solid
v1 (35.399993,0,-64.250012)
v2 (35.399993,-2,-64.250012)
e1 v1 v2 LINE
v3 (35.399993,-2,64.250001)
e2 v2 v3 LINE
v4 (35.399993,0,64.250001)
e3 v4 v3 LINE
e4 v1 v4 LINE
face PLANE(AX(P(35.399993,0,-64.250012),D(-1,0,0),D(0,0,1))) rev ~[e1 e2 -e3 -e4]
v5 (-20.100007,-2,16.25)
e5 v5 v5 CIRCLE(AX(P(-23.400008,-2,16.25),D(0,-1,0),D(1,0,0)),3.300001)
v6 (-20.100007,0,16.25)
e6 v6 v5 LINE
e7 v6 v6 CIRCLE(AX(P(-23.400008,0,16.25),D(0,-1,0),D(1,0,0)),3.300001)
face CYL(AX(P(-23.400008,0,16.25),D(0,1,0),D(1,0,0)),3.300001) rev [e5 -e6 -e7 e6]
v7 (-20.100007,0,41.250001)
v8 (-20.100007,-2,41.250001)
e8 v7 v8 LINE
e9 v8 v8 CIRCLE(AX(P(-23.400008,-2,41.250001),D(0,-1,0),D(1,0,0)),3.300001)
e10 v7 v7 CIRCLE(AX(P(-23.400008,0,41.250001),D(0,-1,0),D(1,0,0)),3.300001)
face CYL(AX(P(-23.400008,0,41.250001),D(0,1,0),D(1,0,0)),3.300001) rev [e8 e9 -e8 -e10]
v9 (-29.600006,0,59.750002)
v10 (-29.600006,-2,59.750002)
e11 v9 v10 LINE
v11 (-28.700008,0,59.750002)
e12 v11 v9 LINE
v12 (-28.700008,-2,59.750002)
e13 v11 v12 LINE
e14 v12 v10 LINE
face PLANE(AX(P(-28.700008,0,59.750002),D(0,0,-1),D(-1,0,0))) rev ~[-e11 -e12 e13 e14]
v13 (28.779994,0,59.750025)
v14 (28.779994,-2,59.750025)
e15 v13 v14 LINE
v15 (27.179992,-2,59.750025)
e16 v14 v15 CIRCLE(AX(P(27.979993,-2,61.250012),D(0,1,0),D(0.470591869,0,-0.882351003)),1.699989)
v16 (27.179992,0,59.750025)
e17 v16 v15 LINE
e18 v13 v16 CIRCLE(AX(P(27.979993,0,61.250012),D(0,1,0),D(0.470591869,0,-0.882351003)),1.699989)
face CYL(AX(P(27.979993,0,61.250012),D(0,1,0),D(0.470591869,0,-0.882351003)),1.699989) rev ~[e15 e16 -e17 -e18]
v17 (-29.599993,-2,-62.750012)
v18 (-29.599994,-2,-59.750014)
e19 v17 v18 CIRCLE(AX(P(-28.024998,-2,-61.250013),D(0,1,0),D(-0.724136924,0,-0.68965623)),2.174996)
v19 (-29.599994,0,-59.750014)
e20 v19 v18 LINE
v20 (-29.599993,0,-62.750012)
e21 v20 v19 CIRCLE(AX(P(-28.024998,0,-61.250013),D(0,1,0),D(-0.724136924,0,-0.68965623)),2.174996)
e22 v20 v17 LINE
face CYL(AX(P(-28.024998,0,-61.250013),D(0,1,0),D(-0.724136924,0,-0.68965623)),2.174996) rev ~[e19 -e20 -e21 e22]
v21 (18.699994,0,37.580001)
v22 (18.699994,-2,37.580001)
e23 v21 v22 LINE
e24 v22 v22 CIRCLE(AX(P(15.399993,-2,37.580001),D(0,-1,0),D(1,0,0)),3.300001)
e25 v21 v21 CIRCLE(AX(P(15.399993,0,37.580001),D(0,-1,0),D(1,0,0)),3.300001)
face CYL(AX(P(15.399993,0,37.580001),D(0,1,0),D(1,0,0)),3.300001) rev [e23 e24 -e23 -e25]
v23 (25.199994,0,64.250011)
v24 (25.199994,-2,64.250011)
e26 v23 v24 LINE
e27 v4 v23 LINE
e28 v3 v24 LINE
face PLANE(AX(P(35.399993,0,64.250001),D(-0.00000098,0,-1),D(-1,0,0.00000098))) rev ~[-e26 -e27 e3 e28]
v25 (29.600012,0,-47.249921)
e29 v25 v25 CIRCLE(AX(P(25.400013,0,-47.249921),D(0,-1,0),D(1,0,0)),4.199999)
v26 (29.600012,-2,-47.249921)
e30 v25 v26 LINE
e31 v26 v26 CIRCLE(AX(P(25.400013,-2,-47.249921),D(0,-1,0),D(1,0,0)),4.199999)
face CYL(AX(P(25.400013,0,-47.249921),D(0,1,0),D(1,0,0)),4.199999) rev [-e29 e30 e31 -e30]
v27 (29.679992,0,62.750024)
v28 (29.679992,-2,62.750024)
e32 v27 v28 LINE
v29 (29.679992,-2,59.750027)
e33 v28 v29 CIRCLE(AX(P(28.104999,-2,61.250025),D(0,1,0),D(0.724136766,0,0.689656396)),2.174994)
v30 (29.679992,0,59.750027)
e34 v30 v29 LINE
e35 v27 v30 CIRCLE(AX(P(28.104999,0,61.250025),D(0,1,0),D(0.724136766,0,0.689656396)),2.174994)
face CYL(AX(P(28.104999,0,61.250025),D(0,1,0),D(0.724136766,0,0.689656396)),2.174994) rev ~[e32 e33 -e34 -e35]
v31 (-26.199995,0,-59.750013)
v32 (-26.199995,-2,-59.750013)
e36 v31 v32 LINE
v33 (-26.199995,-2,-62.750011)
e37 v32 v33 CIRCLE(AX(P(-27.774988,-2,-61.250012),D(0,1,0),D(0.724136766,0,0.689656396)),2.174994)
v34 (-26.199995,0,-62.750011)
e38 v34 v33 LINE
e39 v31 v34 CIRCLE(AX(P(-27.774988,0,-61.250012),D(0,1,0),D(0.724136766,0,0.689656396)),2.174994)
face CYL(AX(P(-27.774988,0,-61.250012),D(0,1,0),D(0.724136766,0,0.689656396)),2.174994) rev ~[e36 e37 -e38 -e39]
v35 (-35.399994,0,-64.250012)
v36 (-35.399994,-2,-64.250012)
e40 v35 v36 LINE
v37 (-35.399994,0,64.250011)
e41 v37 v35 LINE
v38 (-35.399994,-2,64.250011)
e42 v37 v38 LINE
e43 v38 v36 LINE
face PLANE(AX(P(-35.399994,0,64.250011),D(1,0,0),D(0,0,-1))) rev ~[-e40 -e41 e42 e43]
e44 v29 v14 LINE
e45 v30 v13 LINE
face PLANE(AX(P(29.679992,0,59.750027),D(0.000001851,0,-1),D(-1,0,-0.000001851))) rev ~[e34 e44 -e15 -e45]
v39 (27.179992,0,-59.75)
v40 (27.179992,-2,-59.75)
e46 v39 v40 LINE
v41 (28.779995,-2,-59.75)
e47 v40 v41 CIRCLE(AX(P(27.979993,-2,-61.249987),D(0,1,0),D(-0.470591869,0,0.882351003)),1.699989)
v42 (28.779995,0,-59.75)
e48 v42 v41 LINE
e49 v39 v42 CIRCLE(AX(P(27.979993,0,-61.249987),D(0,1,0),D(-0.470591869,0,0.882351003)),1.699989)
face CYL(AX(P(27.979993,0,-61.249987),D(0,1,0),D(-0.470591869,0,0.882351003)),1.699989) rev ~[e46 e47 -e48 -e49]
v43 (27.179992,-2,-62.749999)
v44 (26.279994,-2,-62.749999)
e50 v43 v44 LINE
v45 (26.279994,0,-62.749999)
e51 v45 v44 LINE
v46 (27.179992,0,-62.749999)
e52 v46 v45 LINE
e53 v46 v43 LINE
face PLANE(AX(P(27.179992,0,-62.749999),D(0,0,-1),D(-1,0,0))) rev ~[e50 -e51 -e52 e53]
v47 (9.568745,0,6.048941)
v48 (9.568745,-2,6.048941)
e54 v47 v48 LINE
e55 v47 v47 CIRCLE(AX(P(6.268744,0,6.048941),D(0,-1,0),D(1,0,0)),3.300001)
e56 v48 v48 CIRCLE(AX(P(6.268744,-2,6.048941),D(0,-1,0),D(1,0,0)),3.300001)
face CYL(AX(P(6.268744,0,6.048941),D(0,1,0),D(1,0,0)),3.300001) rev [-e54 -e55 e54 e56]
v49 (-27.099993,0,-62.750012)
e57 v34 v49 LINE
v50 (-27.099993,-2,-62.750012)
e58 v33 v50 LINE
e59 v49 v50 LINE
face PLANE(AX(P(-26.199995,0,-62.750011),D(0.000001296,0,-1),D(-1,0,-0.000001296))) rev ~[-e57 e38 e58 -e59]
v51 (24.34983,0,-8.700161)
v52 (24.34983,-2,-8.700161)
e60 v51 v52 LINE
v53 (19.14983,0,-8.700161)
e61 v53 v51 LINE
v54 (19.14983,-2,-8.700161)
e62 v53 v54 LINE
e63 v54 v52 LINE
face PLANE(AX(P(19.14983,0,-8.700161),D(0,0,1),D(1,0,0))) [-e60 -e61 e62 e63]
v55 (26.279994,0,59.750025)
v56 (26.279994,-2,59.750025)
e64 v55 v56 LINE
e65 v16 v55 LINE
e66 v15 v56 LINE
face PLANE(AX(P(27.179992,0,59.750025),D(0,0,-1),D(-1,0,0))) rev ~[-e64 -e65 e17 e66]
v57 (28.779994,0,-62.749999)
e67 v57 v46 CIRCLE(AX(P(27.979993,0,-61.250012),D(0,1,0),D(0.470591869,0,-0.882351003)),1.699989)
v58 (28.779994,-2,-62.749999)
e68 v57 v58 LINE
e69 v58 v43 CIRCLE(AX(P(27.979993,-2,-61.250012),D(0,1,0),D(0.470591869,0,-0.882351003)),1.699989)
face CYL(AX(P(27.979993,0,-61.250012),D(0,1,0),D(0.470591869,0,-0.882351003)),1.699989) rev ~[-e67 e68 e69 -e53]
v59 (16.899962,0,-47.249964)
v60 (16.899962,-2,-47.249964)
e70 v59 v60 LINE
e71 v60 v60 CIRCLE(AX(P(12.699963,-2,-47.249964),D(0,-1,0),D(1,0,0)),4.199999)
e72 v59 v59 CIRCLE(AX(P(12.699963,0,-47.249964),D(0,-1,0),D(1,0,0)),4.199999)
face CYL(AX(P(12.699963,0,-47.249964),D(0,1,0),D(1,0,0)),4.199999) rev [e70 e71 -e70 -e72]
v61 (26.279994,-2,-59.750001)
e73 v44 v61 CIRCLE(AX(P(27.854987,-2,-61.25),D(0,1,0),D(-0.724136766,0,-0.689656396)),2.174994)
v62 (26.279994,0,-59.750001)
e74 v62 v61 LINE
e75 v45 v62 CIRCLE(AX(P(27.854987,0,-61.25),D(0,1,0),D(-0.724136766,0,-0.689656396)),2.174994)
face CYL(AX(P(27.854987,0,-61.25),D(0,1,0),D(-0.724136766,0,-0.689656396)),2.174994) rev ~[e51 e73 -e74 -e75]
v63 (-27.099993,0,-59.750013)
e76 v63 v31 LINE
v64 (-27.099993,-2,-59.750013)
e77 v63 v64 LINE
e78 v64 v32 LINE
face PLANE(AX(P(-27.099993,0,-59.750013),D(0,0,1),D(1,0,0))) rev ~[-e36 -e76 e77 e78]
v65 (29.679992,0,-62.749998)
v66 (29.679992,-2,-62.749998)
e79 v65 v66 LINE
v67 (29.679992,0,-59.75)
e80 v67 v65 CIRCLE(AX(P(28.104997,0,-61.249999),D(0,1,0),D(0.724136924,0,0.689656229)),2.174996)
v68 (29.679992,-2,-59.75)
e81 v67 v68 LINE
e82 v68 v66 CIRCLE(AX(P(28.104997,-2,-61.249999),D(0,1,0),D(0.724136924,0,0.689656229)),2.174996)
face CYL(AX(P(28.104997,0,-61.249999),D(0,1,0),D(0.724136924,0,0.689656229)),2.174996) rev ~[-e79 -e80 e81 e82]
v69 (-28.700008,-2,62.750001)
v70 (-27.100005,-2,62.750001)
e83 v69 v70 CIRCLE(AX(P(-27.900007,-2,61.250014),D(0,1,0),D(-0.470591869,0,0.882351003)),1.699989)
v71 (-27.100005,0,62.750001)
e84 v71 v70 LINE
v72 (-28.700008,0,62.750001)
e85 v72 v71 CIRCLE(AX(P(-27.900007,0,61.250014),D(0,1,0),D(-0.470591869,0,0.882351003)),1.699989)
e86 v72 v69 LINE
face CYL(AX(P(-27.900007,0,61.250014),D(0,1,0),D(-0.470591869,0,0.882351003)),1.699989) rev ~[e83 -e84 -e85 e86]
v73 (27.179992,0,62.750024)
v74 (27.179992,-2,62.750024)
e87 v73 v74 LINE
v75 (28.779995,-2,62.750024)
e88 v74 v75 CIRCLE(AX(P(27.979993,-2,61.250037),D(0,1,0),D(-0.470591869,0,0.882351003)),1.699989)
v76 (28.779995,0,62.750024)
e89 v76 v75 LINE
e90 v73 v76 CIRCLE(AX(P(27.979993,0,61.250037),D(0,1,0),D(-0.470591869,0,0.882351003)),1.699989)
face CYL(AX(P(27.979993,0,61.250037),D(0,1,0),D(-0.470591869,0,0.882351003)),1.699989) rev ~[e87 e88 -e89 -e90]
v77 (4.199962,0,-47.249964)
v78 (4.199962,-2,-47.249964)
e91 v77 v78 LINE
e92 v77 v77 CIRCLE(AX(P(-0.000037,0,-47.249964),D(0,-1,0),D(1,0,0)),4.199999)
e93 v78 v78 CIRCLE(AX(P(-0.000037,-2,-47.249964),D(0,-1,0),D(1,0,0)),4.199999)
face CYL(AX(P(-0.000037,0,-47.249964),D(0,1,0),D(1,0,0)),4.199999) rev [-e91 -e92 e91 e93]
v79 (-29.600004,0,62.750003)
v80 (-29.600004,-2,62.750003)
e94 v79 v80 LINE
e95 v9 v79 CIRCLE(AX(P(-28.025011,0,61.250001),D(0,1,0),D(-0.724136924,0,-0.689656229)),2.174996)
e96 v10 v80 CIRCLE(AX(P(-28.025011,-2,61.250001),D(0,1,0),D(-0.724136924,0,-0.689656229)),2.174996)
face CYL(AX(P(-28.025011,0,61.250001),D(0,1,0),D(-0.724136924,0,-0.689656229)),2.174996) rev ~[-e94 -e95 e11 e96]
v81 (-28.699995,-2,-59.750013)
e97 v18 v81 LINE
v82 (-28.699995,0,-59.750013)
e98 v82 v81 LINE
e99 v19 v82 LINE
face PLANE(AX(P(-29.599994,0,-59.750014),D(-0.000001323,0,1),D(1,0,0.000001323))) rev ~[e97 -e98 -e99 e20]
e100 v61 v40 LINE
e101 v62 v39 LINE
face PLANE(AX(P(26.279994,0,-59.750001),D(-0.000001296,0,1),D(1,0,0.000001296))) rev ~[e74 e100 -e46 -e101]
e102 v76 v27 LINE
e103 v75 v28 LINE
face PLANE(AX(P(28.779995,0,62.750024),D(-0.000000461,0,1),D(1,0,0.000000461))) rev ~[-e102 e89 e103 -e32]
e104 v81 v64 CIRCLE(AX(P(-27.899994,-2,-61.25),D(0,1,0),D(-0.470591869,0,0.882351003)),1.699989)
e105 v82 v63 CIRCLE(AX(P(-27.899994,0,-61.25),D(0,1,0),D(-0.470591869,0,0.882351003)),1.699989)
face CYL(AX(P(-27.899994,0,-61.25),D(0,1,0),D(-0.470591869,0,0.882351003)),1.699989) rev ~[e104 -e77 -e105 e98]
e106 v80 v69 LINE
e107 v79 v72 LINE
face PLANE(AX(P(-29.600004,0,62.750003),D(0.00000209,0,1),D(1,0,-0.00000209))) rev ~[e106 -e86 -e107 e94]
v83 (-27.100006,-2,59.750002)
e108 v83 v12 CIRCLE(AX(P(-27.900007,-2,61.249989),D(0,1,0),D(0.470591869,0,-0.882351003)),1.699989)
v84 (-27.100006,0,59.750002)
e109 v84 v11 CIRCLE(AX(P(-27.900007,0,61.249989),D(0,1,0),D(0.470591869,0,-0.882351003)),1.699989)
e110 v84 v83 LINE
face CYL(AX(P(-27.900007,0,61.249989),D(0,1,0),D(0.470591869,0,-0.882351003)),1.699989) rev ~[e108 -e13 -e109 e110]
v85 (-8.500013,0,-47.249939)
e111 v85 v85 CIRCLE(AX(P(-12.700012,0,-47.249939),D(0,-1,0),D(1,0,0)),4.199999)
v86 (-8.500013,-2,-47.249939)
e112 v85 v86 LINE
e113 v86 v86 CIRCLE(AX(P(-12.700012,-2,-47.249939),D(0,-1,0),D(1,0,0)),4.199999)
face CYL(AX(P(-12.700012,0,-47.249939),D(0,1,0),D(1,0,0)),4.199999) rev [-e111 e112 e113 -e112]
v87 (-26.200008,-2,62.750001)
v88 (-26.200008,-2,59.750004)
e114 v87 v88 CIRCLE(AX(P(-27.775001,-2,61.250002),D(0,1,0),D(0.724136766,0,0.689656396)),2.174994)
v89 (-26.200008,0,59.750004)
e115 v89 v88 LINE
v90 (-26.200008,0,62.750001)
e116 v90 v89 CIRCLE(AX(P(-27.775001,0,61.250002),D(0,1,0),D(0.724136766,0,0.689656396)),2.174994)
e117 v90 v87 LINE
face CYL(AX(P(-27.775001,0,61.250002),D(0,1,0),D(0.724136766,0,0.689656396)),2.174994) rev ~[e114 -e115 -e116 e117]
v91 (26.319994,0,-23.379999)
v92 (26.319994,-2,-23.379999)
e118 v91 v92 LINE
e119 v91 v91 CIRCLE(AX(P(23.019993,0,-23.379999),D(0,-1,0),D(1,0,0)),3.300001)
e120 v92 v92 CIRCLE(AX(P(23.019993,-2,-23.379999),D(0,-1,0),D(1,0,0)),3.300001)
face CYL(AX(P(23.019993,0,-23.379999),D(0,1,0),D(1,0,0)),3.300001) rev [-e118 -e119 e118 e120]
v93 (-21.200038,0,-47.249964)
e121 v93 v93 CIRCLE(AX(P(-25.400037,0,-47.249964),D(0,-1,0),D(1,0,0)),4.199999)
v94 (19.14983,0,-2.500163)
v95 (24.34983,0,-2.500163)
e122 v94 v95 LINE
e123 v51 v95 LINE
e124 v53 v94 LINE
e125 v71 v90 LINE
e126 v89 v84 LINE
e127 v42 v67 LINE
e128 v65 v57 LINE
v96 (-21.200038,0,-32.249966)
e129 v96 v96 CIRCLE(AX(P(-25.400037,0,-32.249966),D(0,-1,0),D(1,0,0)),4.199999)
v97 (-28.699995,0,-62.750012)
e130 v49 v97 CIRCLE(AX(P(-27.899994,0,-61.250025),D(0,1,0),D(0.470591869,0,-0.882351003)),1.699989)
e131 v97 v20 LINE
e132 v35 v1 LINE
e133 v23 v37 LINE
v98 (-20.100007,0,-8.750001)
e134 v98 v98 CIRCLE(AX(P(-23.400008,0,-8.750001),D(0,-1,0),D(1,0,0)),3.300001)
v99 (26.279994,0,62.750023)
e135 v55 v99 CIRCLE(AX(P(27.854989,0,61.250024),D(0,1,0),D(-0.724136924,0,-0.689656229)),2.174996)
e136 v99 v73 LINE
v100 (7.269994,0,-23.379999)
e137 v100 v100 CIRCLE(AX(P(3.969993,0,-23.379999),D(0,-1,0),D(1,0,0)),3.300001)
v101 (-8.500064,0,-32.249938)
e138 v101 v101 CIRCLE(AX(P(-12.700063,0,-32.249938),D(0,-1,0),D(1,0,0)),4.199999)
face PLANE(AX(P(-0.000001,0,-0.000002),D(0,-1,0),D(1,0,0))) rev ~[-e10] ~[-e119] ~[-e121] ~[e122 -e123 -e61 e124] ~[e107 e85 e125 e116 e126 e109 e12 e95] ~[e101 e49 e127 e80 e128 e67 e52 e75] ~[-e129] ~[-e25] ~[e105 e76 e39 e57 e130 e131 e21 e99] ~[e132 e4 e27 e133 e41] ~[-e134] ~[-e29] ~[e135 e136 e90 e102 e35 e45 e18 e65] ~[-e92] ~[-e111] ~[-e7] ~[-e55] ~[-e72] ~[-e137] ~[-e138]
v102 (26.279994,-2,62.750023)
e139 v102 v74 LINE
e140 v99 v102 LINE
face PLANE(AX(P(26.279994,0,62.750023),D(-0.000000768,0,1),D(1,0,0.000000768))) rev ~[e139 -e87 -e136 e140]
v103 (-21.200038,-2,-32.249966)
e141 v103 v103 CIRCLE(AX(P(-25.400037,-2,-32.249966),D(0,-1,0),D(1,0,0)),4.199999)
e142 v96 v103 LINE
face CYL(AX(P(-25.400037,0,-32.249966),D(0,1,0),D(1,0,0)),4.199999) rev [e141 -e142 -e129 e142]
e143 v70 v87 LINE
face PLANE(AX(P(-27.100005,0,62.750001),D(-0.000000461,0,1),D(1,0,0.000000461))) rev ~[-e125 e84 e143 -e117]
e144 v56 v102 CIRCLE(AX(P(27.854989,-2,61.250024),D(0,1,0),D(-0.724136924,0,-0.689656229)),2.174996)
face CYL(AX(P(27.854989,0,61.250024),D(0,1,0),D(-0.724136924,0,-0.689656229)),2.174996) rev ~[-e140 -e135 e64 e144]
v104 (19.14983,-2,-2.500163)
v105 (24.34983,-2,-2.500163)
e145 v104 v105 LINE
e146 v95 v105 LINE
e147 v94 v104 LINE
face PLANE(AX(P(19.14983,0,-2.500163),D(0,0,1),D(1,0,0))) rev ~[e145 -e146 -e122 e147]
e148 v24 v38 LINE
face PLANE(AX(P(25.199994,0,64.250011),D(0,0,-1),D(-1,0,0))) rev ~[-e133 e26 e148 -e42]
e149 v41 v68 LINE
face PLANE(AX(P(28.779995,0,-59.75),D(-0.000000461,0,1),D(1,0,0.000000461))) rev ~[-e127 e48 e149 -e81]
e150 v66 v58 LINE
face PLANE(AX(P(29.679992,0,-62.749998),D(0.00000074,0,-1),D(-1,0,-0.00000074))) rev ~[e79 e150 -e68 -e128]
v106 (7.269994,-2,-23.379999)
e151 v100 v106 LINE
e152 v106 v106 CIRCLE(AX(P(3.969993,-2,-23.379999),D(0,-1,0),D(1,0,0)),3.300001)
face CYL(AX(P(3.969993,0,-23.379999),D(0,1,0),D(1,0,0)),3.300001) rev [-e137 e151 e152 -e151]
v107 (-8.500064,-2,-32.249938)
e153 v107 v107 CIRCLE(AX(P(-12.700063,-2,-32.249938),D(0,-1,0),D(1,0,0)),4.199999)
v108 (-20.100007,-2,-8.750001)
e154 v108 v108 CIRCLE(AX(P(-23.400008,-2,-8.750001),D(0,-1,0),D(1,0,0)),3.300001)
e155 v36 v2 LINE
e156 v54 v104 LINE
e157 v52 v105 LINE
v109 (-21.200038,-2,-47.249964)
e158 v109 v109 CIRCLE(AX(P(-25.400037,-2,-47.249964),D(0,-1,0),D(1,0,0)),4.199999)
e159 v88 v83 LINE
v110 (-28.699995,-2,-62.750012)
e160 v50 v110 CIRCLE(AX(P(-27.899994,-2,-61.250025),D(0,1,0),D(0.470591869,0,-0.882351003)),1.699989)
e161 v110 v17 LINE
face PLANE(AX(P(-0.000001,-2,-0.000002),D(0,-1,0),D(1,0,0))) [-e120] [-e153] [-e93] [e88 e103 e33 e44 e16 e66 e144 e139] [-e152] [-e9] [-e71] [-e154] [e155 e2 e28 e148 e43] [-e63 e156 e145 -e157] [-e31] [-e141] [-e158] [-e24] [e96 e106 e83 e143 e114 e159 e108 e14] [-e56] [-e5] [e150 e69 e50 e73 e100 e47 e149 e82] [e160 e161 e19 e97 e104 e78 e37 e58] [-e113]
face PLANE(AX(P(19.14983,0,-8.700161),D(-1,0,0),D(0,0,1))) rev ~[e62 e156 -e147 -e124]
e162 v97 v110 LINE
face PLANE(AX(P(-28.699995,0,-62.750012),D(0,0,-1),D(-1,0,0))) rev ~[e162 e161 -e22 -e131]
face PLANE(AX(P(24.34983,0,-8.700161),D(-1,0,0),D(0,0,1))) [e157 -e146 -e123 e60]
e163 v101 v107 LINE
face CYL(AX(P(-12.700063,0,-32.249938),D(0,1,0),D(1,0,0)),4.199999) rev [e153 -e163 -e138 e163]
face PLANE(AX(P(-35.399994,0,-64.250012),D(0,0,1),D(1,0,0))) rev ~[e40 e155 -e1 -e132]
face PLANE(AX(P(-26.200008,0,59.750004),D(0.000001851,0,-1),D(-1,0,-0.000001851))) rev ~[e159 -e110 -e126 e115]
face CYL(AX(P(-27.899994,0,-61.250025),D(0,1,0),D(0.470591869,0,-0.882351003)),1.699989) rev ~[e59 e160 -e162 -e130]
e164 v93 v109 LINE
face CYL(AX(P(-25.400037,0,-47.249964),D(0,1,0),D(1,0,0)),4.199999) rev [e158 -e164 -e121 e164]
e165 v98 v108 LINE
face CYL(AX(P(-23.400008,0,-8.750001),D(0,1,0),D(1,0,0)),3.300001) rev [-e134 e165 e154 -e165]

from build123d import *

# Parameters (mm, degrees)
F0_R     = 4.199999
F0_R_2   = 3.300001
F0_W     = 5.2
F0_H     = 6.199998
F1_DEPTH = 2


# Not quite as in the source:
# - ends of sketch curves that miss each other by under 0.0002 mm in the source are joined


with BuildPart() as f1:
    # F0 (on Front) → F1 (new body)
    with BuildSketch(Plane.XZ):
        Polygon((-35.399994, -61.250012), (-35.399994, -64.250012), (35.399993, -64.250012), (35.399993, 64.250001), (25.199994, 64.250011), (15.100006, 64.250011), (-35.399994, 64.250011), align=None)
        with BuildLine():
            Line((-28.699995, -62.750012), (-29.599993, -62.750012))
            ThreePointArc((-29.599993, -62.750012), (-30.199994, -61.2500123621), (-29.5999938002, -59.7500141903))
            Line((-29.5999938002, -59.7500141903), (-28.699995, -59.750013))
            ThreePointArc((-28.699995, -59.750013), (-27.8999944412, -59.550011), (-27.099993, -59.750013))
            Line((-27.099993, -59.750013), (-26.199995, -59.750013))
            ThreePointArc((-26.199995, -59.750013), (-25.599994, -61.2500123621), (-26.1999951748, -62.7500108335))
            Line((-26.1999951748, -62.7500108335), (-27.099993, -62.750012))
            ThreePointArc((-27.099993, -62.750012), (-27.8999944412, -62.950014), (-28.699995, -62.750012))
        make_face(mode=Mode.SUBTRACT)
        with Locations((-25.400037, -47.249964)):
            Circle(F0_R, mode=Mode.SUBTRACT)
        with Locations((-25.400037, -32.249966)):
            Circle(F0_R, mode=Mode.SUBTRACT)
        with Locations((-12.700012, -47.249939)):
            Circle(F0_R, mode=Mode.SUBTRACT)
        with Locations((-12.700063, -32.249938)):
            Circle(F0_R, mode=Mode.SUBTRACT)
        with Locations((-3.7e-05, -47.249964)):
            Circle(F0_R, mode=Mode.SUBTRACT)
        with Locations((-23.400008, -8.750001)):
            Circle(F0_R_2, mode=Mode.SUBTRACT)
        with Locations((12.699963, -47.249964)):
            Circle(F0_R, mode=Mode.SUBTRACT)
        with BuildLine():
            ThreePointArc((27.179992, -59.75), (27.9799934412, -59.549998), (28.7799947785, -59.7500004152))
            Line((28.7799947785, -59.7500004152), (29.679992, -59.75))
            ThreePointArc((29.679992, -59.75), (30.279993, -61.25), (29.6799923008, -62.7499983341))
            Line((29.6799923008, -62.7499983341), (28.779994, -62.749999))
            ThreePointArc((28.779994, -62.749999), (27.9799934412, -62.950001), (27.179992, -62.749999))
            Line((27.179992, -62.749999), (26.279994, -62.749999))
            ThreePointArc((26.279994, -62.749999), (25.679993, -61.25), (26.2799941748, -59.7500011665))
            Line((26.2799941748, -59.7500011665), (27.179992, -59.75))
        make_face(mode=Mode.SUBTRACT)
        with Locations((25.400013, -47.249921)):
            Circle(F0_R, mode=Mode.SUBTRACT)
        with Locations((3.969993, -23.379999)):
            Circle(F0_R_2, mode=Mode.SUBTRACT)
        with Locations((23.019993, -23.379999)):
            Circle(F0_R_2, mode=Mode.SUBTRACT)
        with Locations((21.74983, -5.600162)):
            Rectangle(F0_W, F0_H, mode=Mode.SUBTRACT)
        with Locations((-23.400008, 16.25)):
            Circle(F0_R_2, mode=Mode.SUBTRACT)
        with Locations((-23.400008, 41.250001)):
            Circle(F0_R_2, mode=Mode.SUBTRACT)
        with BuildLine():
            Line((-28.700008, 59.750002), (-29.600006, 59.750002))
            ThreePointArc((-29.600006, 59.750002), (-30.200007, 61.250002), (-29.6000038751, 62.7500028811))
            Line((-29.6000038751, 62.7500028811), (-28.700008, 62.750001))
            ThreePointArc((-28.700008, 62.750001), (-27.9000065588, 62.950003), (-27.1000052215, 62.7500005848))
            Line((-27.1000052215, 62.7500005848), (-26.200008, 62.750001))
            ThreePointArc((-26.200008, 62.750001), (-25.600007, 61.250002), (-26.2000076992, 59.7500036659))
            Line((-26.2000076992, 59.7500036659), (-27.100006, 59.750002))
            ThreePointArc((-27.100006, 59.750002), (-27.9000065588, 59.55), (-28.700008, 59.750002))
        make_face(mode=Mode.SUBTRACT)
        with Locations((6.268744, 6.048941)):
            Circle(F0_R_2, mode=Mode.SUBTRACT)
        with Locations((15.399993, 37.580001)):
            Circle(F0_R_2, mode=Mode.SUBTRACT)
        with BuildLine():
            Line((27.179992, 59.750025), (26.279994, 59.750025))
            ThreePointArc((26.279994, 59.750025), (25.679993, 61.2500246379), (26.2799936754, 62.7500233092))
            Line((26.2799936754, 62.7500233092), (27.179992, 62.750024))
            ThreePointArc((27.179992, 62.750024), (27.9799934412, 62.950026), (28.7799947785, 62.7500235848))
            Line((28.7799947785, 62.7500235848), (29.679992, 62.750024))
            ThreePointArc((29.679992, 62.750024), (30.279993, 61.2500246379), (29.6799923008, 59.7500266659))
            Line((29.6799923008, 59.7500266659), (28.779994, 59.750025))
            ThreePointArc((28.779994, 59.750025), (27.9799934412, 59.550023), (27.179992, 59.750025))
        make_face(mode=Mode.SUBTRACT)
    extrude(amount=F1_DEPTH)


solid = f1.part
